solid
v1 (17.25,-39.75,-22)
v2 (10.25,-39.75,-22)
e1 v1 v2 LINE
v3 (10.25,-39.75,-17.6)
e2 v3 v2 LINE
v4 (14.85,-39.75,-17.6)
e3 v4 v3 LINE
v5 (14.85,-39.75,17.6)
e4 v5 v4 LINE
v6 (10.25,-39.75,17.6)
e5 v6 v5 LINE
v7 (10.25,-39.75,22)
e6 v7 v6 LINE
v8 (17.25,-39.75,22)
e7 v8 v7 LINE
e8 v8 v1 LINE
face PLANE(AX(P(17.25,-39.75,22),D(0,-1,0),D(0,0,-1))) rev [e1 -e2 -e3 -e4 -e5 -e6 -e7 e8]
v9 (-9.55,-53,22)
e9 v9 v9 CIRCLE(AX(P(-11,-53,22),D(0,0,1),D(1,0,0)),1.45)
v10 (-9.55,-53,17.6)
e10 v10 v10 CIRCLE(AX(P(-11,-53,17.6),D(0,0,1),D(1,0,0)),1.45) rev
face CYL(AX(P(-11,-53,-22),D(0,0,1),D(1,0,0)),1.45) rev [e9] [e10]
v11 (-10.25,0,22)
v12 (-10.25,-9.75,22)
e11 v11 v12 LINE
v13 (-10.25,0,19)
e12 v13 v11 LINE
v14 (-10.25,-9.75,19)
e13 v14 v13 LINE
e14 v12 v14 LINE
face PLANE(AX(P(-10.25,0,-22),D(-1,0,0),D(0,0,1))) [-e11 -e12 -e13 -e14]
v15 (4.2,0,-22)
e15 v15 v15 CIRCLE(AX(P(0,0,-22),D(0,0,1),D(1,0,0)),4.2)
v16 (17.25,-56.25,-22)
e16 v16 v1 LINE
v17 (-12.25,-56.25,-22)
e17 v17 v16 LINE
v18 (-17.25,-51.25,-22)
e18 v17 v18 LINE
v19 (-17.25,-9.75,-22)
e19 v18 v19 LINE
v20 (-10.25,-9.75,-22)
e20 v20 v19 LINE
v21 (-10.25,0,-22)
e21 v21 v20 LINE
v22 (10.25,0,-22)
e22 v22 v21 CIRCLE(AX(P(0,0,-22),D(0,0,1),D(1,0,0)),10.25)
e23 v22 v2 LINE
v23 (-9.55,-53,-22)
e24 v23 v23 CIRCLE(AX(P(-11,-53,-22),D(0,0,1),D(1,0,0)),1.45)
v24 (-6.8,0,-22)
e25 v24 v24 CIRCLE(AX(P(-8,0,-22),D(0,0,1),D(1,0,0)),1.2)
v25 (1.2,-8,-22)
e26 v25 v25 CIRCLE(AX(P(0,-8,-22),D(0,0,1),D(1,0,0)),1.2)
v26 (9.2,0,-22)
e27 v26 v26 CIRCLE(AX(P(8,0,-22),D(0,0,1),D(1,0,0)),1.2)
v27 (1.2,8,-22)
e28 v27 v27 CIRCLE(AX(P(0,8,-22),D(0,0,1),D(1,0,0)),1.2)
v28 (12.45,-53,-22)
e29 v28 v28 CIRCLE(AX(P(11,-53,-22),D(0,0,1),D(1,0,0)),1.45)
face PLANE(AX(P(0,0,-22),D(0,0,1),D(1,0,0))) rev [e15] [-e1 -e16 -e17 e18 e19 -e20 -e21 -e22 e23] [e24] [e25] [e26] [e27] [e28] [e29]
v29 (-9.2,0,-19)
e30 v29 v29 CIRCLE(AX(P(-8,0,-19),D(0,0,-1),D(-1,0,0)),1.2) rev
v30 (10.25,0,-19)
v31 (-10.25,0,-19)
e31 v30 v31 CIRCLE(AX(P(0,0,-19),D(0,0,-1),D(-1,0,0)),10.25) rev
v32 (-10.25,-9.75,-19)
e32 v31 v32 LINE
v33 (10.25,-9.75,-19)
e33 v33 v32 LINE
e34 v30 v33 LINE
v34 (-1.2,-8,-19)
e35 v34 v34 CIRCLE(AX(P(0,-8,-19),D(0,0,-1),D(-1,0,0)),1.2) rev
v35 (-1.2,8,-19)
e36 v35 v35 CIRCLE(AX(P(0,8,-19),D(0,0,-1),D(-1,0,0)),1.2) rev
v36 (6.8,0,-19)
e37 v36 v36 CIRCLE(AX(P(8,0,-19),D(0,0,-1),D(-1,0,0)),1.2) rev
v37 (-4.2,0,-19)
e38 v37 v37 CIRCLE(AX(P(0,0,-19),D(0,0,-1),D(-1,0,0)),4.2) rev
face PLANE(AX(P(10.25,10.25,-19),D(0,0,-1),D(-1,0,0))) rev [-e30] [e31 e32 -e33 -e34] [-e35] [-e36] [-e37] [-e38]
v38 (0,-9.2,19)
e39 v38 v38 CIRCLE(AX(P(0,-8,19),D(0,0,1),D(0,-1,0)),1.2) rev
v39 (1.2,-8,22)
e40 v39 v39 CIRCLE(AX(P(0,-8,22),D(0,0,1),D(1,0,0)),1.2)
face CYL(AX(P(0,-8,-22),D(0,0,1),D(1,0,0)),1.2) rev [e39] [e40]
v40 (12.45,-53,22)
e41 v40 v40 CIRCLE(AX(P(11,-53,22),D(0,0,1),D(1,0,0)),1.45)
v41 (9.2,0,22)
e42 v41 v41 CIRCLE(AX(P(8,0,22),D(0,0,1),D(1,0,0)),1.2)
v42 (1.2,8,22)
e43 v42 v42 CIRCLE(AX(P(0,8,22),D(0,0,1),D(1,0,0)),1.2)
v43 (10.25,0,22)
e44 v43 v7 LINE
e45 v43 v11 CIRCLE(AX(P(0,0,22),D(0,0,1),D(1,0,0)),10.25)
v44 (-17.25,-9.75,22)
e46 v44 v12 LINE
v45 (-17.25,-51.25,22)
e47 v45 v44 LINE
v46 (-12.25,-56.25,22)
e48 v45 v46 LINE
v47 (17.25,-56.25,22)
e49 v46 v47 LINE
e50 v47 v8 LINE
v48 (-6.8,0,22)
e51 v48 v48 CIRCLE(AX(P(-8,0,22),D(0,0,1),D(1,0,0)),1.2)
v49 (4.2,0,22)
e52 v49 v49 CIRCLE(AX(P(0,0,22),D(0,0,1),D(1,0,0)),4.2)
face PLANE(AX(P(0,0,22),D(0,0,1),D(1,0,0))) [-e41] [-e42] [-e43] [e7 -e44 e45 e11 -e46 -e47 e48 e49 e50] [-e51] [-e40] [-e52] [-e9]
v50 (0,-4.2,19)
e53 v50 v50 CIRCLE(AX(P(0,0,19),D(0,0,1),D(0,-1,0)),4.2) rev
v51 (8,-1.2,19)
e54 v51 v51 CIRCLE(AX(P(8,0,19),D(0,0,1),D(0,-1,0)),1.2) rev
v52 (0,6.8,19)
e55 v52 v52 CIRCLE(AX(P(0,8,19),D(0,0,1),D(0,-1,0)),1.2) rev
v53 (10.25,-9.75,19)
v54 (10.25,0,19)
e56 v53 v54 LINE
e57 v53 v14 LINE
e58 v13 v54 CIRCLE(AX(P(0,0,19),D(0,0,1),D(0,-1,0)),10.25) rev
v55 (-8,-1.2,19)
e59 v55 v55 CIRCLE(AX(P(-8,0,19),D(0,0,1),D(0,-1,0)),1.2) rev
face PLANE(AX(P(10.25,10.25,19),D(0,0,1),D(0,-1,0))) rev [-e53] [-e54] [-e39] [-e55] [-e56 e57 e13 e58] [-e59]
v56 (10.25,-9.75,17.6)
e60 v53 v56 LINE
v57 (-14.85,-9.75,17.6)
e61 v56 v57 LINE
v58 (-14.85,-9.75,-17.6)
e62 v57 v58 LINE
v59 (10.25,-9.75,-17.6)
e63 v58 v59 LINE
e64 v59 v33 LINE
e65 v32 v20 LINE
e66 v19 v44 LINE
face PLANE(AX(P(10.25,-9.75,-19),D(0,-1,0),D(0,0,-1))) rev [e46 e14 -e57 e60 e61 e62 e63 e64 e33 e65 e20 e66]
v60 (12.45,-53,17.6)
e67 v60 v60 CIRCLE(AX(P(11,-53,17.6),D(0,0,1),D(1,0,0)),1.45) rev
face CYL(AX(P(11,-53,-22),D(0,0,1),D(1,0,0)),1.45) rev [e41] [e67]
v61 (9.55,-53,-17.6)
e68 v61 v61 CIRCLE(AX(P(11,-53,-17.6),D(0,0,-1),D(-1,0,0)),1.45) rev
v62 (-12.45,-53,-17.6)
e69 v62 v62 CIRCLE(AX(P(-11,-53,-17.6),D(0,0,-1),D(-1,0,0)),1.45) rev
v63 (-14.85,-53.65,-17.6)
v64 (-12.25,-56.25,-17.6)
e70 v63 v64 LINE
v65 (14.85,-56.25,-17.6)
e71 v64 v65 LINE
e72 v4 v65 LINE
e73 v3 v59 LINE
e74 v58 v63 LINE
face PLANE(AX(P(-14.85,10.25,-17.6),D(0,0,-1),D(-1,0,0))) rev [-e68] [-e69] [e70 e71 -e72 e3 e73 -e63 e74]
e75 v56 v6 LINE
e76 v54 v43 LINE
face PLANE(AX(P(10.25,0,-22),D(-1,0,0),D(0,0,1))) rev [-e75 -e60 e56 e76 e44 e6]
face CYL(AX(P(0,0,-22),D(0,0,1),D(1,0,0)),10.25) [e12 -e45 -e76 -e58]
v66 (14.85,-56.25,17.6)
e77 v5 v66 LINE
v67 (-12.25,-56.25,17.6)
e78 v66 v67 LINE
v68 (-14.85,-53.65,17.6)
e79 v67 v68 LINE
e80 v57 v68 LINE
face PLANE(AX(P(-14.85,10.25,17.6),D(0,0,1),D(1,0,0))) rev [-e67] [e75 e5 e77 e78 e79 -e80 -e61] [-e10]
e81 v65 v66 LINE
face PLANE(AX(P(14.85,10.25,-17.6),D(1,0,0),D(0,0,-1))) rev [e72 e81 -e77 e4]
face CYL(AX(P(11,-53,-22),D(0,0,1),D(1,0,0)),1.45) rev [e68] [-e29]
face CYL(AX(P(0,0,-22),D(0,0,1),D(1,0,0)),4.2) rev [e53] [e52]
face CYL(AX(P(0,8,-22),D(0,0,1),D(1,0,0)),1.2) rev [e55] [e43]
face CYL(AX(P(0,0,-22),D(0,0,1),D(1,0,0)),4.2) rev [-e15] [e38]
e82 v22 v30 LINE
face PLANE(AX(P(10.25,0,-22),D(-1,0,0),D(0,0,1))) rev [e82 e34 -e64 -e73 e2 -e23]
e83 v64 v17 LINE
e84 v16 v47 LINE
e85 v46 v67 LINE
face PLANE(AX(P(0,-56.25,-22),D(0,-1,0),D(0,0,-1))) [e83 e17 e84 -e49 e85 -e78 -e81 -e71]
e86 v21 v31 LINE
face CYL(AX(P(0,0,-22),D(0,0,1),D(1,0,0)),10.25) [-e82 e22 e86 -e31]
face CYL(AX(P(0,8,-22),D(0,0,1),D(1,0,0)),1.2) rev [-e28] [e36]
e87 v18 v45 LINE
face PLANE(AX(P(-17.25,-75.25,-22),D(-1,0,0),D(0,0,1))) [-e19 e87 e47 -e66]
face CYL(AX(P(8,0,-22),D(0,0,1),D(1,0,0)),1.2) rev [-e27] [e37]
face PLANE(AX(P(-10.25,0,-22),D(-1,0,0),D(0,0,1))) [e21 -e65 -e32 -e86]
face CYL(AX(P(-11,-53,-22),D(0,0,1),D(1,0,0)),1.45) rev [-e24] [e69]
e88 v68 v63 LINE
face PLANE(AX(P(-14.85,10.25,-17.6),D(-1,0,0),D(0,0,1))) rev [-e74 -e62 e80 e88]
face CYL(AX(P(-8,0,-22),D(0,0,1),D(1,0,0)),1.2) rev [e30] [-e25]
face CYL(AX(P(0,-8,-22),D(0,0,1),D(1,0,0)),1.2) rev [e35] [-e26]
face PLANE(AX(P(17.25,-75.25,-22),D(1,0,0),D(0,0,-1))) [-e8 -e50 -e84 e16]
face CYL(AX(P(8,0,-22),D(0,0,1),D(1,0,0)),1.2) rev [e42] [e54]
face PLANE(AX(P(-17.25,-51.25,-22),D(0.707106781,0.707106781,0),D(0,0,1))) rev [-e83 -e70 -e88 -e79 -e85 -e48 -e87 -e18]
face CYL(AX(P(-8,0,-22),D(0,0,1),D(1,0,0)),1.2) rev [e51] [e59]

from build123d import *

# Parameters (mm, degrees)
BOSS_EXTRUDE1_DEPTH      = 22
BOSS_EXTRUDE1_DEPTH_BACK = 22
SKETCH2_W                = 38
SKETCH2_H                = 20
CUT_EXTRUDE1_DEPTH       = 105.423416914
SKETCH3_W                = 7
SKETCH3_H                = 44
BOSS_EXTRUDE2_DEPTH      = 65.5
SKETCH23_R               = 5
SKETCH23_R_2             = 1.2
CUT_EXTRUDE2_DEPTH       = 111.605436123
SKETCH24_W               = 28.5
SKETCH24_H               = 34
CUT_EXTRUDE3_DEPTH       = 90.954502389
SKETCH26_R               = 1.2
SKETCH26_R_2             = 5
SKETCH26_R_3             = 1.45
CUT_EXTRUDE6_DEPTH       = 107.330263801
SKETCH27_W               = 29.7
SKETCH27_H               = 35.2
CUT_EXTRUDE8_DEPTH       = 73.137455597
SKETCH29_W               = 7
SKETCH29_H               = 30
CUT_EXTRUDE10_DEPTH      = 74.468530678
CHAMFER2_SIZE            = 5


with BuildPart() as part:
    # Sketch1 → Boss-Extrude1 (new, two sides: drawn at the far end of the back side and taken through both)
    with BuildSketch(Plane.XY.offset(-BOSS_EXTRUDE1_DEPTH_BACK)):
        with BuildLine():
            Line((10.25, -60), (10.25, 0))
            ThreePointArc((10.25, 0), (0, -10.25), (-10.25, 0))
            Line((-10.25, 0), (-10.25, -60))
            Line((-10.25, -60), (-10.25, -100))
            Line((-10.25, -100), (10.25, -100))
            Line((10.25, -100), (10.25, -60))
        make_face()
        with BuildLine():
            Line((10.25, 0), (9.2, 0))
            ThreePointArc((9.2, 0), (8.816088231, -0.879772698), (7.91, -1.196620241))
            ThreePointArc((7.91, -1.196620241), (5.656854249, -5.656854249), (1.196620241, -7.91))
            ThreePointArc((1.196620241, -7.91), (1.199154762, -7.954968281), (1.2, -8))
            ThreePointArc((1.2, -8), (-0.045031719, -9.199154762), (-1.196620241, -7.91))
            ThreePointArc((-1.196620241, -7.91), (-5.656854249, -5.656854249), (-7.91, -1.196620241))
            ThreePointArc((-7.91, -1.196620241), (-8.816088231, -0.879772698), (-9.2, 0))
            Line((-9.2, 0), (-10.25, 0))
            ThreePointArc((-10.25, 0), (0, -10.25), (10.25, 0))
        make_face()
        with BuildLine():
            ThreePointArc((7.91, -1.196620241), (7.120227302, -0.816088231), (6.8, 0))
            Line((6.8, 0), (4.2, 0))
            ThreePointArc((4.2, 0), (0, -4.2), (-4.2, 0))
            Line((-4.2, 0), (-6.8, 0))
            ThreePointArc((-6.8, 0), (-7.120227302, -0.816088231), (-7.91, -1.196620241))
            ThreePointArc((-7.91, -1.196620241), (-5.656854249, -5.656854249), (-1.196620241, -7.91))
            ThreePointArc((-1.196620241, -7.91), (0, -6.8), (1.196620241, -7.91))
            ThreePointArc((1.196620241, -7.91), (5.656854249, -5.656854249), (7.91, -1.196620241))
        make_face()
        with BuildLine():
            Line((4.2, 0), (6.8, 0))
            ThreePointArc((6.8, 0), (7.120227302, 0.816088231), (7.91, 1.196620241))
            ThreePointArc((7.91, 1.196620241), (5.656854249, 5.656854249), (1.196620241, 7.91))
            ThreePointArc((1.196620241, 7.91), (0, 6.8), (-1.196620241, 7.91))
            ThreePointArc((-1.196620241, 7.91), (-5.656854249, 5.656854249), (-7.91, 1.196620241))
            ThreePointArc((-7.91, 1.196620241), (-7.120227302, 0.816088231), (-6.8, 0))
            Line((-6.8, 0), (-4.2, 0))
            ThreePointArc((-4.2, 0), (0, 4.2), (4.2, 0))
        make_face()
        with BuildLine():
            ThreePointArc((7.91, 1.196620241), (8.816088231, 0.879772698), (9.2, 0))
            Line((9.2, 0), (10.25, 0))
            ThreePointArc((10.25, 0), (0, 10.25), (-10.25, 0))
            Line((-10.25, 0), (-9.2, 0))
            ThreePointArc((-9.2, 0), (-8.816088231, 0.879772698), (-7.91, 1.196620241))
            ThreePointArc((-7.91, 1.196620241), (-5.656854249, 5.656854249), (-1.196620241, 7.91))
            ThreePointArc((-1.196620241, 7.91), (-0.045031719, 9.199154762), (1.2, 8))
            ThreePointArc((1.2, 8), (1.199154762, 7.954968281), (1.196620241, 7.91))
            ThreePointArc((1.196620241, 7.91), (5.656854249, 5.656854249), (7.91, 1.196620241))
        make_face()
    extrude(amount=BOSS_EXTRUDE1_DEPTH + BOSS_EXTRUDE1_DEPTH_BACK)

    # Sketch2 → Cut-Extrude1 (cut, through all)
    with BuildSketch(Plane.ZY.offset(10.25)):
        with Locations((0, 0.25)):
            Rectangle(SKETCH2_W, SKETCH2_H)
    extrude(amount=-CUT_EXTRUDE1_DEPTH, mode=Mode.SUBTRACT)

    # Sketch3 → Boss-Extrude2 (add)
    with BuildSketch(Plane(origin=(0, -9.75, 0), x_dir=(1, 0, 0), z_dir=(0, 1, 0))):
        with Locations((-13.75, 0)):
            Rectangle(SKETCH3_W, SKETCH3_H)
        with Locations((13.75, 0)):
            Rectangle(SKETCH3_W, SKETCH3_H)
    extrude(amount=-BOSS_EXTRUDE2_DEPTH)

    # Sketch23 → Cut-Extrude2 (cut, through all)
    with BuildSketch(Plane.XY.offset(22)):
        with BuildLine():
            Line((-10.25, -100), (10.25, -100))
            Line((10.25, -100), (10.25, -85))
            ThreePointArc((10.25, -85), (0, -95.25), (-10.25, -85))
            Line((-10.25, -85), (-10.25, -100))
        make_face()
        with Locations((0, -85)):
            Circle(SKETCH23_R)
        with Locations((8, -85)):
            Circle(SKETCH23_R_2)
        with Locations((0, -77)):
            Circle(SKETCH23_R_2)
        with Locations((0, -93)):
            Circle(SKETCH23_R_2)
        with Locations((-8, -85)):
            Circle(SKETCH23_R_2)
    extrude(amount=-CUT_EXTRUDE2_DEPTH, mode=Mode.SUBTRACT)

    # Sketch24 → Cut-Extrude3 (cut, through all)
    with BuildSketch(Plane(origin=(0, -9.75, 0), x_dir=(1, 0, 0), z_dir=(0, 1, 0))):
        Rectangle(SKETCH24_W, SKETCH24_H)
    extrude(amount=-CUT_EXTRUDE3_DEPTH, mode=Mode.SUBTRACT)

    # Sketch26 → Cut-Extrude6 (cut, through all)
    # profile 1 of 5: a face of its own
    with BuildSketch(Plane.XY.offset(22)):
        with BuildLine():
            Line((10.25, -75.25), (14.25, -75.25))
            Line((14.25, -75.25), (14.25, -56.53282359))
            Line((14.25, -56.53282359), (14.25, -56.25))
            Line((14.25, -56.25), (-14.25, -56.25))
            Line((-14.25, -56.25), (-14.25, -56.53282359))
            Line((-14.25, -56.53282359), (-14.25, -75.25))
            Line((-14.25, -75.25), (-10.25, -75.25))
            Line((-10.25, -75.25), (-10.25, -85))
            ThreePointArc((-10.25, -85), (0, -95.25), (10.25, -85))
            Line((10.25, -85), (10.25, -75.25))
        make_face()
        with Locations((-8, -85)):
            Circle(SKETCH26_R, mode=Mode.SUBTRACT)
        with Locations((0, -85)):
            Circle(SKETCH26_R_2, mode=Mode.SUBTRACT)
        with Locations((0, -77)):
            Circle(SKETCH26_R, mode=Mode.SUBTRACT)
        with Locations((0, -93)):
            Circle(SKETCH26_R, mode=Mode.SUBTRACT)
        with Locations((8, -85)):
            Circle(SKETCH26_R, mode=Mode.SUBTRACT)
    # profile 2 of 5: a face of its own
    with BuildSketch(Plane.XY.offset(22)):
        Polygon((-17.25, -75.25), (-14.25, -75.25), (-14.25, -56.53282359), (-14.25, -56.25), (-17.25, -56.25), align=None)
    # profile 3 of 5: a face of its own
    with BuildSketch(Plane.XY.offset(22)):
        Polygon((14.25, -56.53282359), (14.25, -75.25), (17.25, -75.25), (17.25, -56.25), (14.25, -56.25), align=None)
    # profile 4 of 5: a face of its own
    with BuildSketch(Plane.XY.offset(22)):
        with Locations((-11, -53)):
            Circle(SKETCH26_R_3)
    # profile 5 of 5: a face of its own
    with BuildSketch(Plane.XY.offset(22)):
        with Locations((11, -53)):
            Circle(SKETCH26_R_3)
    extrude(amount=-CUT_EXTRUDE6_DEPTH, mode=Mode.SUBTRACT)

    # Sketch27 → Cut-Extrude8 (cut, through all)
    with BuildSketch(Plane.XZ.offset(56.25)):
        Rectangle(SKETCH27_W, SKETCH27_H)
    extrude(amount=-CUT_EXTRUDE8_DEPTH, mode=Mode.SUBTRACT)

    # Sketch29 → Cut-Extrude10 (cut, through all)
    with BuildSketch(Plane(origin=(0, 0, -22), x_dir=(-1, 0, 0), z_dir=(0, 0, -1))):
        with Locations((-13.75, -24.75)):
            Rectangle(SKETCH29_W, SKETCH29_H)
    extrude(amount=-CUT_EXTRUDE10_DEPTH, mode=Mode.SUBTRACT)

    # Chamfer2
    # the kernel refuses this chamfer: 5 mm, written as the material it takes off along each edge
    with BuildSketch(Plane(origin=(-17.25, -56.25, 34.85841494), x_dir=(0.9996219169112968, -0.027495876610586327, 0), z_dir=(0, 0, -1))) as chamfer2_piece_1:
        Polygon((CHAMFER2_SIZE * 0.999621916911, -CHAMFER2_SIZE * 0.0274958766106), (-CHAMFER2_SIZE * 0.0274958766106, -CHAMFER2_SIZE * 0.999621916911), (0, 0), align=None)
    extrude(amount=69.71682988, mode=Mode.SUBTRACT)


solid = part.part
